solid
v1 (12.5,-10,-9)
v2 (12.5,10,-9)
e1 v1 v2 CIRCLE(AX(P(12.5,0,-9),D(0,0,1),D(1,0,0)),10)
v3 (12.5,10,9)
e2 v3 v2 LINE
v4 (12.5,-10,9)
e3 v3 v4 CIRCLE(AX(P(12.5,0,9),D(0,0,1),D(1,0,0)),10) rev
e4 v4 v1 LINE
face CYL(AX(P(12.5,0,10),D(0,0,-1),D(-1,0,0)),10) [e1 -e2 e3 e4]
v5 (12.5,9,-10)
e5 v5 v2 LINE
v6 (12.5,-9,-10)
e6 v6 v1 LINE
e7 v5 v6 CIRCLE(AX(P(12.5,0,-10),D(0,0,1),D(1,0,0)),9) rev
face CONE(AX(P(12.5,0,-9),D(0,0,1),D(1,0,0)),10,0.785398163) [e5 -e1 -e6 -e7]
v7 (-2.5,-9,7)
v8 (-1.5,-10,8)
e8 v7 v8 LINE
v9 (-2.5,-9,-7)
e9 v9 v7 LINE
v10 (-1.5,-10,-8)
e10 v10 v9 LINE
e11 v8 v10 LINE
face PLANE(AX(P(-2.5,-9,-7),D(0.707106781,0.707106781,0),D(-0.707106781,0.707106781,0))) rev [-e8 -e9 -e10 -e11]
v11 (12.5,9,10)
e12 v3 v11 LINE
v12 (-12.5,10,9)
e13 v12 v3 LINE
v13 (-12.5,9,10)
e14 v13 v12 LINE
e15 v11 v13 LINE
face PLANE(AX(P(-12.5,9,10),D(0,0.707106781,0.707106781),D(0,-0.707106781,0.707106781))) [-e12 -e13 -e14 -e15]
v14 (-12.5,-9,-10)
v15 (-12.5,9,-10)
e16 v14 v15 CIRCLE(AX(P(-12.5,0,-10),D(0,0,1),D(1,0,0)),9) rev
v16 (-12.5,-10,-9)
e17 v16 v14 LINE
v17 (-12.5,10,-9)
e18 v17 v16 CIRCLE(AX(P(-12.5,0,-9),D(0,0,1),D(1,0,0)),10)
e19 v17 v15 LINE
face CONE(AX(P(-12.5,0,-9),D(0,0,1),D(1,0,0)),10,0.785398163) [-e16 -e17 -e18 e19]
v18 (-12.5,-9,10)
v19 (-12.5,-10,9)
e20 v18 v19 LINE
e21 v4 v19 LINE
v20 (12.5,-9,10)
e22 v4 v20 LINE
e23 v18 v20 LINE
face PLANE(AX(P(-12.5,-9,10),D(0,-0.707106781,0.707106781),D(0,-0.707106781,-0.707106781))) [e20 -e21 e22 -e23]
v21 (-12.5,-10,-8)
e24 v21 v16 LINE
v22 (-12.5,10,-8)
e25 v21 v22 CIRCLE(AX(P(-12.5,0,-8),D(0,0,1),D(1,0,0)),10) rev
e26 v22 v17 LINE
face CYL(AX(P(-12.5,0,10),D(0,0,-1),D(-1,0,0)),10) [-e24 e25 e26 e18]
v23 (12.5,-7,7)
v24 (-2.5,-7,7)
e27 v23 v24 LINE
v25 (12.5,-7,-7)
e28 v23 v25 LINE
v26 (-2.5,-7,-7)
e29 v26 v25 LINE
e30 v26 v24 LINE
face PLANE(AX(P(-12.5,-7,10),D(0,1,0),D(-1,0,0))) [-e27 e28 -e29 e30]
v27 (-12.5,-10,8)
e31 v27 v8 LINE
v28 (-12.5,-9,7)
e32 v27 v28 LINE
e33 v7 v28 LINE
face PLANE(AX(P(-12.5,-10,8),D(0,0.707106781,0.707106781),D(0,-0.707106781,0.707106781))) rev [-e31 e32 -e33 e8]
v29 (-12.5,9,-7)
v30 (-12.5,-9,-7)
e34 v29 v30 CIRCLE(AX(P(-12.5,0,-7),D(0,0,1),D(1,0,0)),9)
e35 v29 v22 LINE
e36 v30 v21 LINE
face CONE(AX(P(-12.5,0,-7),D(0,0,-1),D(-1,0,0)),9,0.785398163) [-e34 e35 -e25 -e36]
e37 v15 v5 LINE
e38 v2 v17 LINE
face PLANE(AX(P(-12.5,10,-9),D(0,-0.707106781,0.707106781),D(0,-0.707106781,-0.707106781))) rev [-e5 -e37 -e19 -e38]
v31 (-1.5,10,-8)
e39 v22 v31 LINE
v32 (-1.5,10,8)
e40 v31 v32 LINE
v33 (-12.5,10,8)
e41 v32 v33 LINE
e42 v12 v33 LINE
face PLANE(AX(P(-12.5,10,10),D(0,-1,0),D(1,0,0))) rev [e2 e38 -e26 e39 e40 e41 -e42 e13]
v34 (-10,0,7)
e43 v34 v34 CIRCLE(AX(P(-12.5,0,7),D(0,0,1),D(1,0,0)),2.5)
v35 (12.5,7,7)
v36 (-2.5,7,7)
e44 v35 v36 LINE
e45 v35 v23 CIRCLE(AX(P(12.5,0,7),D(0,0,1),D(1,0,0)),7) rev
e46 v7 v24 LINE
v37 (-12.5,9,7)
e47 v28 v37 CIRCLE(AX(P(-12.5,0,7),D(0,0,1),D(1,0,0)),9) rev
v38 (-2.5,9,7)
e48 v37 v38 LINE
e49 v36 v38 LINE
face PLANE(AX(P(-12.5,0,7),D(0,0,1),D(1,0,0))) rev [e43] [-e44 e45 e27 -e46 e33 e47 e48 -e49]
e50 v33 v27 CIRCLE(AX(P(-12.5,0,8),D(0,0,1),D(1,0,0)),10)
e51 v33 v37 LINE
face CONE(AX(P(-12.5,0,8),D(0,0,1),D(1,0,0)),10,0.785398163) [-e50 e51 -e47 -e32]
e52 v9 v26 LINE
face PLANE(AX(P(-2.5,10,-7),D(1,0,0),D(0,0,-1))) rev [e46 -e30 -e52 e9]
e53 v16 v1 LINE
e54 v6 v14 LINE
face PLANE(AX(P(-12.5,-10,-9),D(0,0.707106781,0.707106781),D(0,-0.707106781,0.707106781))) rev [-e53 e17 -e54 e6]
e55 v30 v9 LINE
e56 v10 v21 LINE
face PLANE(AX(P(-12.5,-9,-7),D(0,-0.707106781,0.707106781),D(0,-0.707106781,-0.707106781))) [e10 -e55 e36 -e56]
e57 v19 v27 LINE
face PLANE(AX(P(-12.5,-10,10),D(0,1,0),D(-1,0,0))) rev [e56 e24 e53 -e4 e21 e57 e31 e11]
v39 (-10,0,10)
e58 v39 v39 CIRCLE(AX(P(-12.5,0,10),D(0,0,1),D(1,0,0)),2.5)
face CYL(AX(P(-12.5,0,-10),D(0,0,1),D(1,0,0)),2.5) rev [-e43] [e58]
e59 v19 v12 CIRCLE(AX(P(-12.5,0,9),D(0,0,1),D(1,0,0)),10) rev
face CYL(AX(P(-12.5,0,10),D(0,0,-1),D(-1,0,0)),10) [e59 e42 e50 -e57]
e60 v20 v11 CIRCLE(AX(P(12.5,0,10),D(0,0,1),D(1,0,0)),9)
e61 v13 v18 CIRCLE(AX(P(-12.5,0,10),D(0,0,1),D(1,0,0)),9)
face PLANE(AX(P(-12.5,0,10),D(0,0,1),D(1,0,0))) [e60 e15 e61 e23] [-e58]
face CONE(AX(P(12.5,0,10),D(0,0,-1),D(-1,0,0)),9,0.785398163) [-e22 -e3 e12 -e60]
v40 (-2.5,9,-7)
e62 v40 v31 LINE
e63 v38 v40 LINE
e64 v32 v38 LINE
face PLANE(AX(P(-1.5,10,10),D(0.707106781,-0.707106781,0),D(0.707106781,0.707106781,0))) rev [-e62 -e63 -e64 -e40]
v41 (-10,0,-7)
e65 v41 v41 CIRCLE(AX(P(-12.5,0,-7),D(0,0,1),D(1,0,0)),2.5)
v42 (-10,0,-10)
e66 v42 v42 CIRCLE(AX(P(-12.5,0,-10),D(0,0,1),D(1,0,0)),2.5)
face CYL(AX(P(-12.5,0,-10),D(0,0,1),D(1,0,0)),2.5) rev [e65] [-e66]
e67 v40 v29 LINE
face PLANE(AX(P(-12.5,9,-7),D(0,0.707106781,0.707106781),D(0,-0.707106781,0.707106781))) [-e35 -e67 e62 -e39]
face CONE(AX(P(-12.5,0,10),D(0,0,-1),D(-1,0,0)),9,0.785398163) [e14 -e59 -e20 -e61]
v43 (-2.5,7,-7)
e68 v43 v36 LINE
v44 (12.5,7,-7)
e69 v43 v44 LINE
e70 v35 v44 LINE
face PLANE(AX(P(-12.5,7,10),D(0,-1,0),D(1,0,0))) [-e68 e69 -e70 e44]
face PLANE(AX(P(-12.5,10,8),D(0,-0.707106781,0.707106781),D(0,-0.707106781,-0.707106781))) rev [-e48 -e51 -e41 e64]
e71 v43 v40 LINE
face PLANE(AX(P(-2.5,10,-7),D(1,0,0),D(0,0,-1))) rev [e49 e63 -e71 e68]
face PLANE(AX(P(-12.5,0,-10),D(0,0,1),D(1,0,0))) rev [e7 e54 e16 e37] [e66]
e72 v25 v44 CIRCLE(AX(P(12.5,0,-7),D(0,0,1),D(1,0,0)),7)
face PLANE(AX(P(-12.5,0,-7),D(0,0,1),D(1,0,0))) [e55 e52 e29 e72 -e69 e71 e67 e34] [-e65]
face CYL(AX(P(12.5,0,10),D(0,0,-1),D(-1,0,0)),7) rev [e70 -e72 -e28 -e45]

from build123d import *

# Parameters (mm, degrees)
BOSS_EXTRUDE1_DEPTH = 10
CUT_EXTRUDE1_DEPTH  = 7
CHAMFER2_SIZE       = 1
CHAMFER3_SIZE       = 1
SKETCH3_R           = 2.5
CUT_EXTRUDE2_DEPTH  = 10
SHELL2_START        = -7
SHELL2_DEPTH        = 14
CHAMFER4_SIZE       = 1


# Read off the part's stored shape, not the designer's step: Shell2
with BuildPart() as part:
    # Sketch1 → Boss-Extrude1 (new, symmetric)
    with BuildSketch(Plane.XY):
        with BuildLine():
            Line((-12.5, 10), (12.5, 10))
            ThreePointArc((12.5, 10), (22.5, 0), (12.5, -10))
            Line((12.5, -10), (-12.5, -10))
            ThreePointArc((-12.5, -10), (-22.5, 0), (-12.5, 10))
        make_face()
    extrude(amount=BOSS_EXTRUDE1_DEPTH, both=True)

    # Sketch2 → Cut-Extrude1 (cut, symmetric)
    with BuildSketch(Plane.XY):
        with BuildLine():
            Line((-12.5, 10), (-2.5, 10))
            Line((-2.5, 10), (-2.5, -10))
            Line((-2.5, -10), (-12.5, -10))
            ThreePointArc((-12.5, -10), (-22.5, 0), (-12.5, 10))
        make_face()
    extrude(amount=CUT_EXTRUDE1_DEPTH, both=True, mode=Mode.SUBTRACT)

    # Chamfer2
    chamfer2_edges = [part.edges().sort_by_distance(p)[0] for p in [
        (-22.5, 0, -7),
        (-7.5, 10, -7),
        (-7.5, -10, -7),
        (-22.5, 0, 7),
        (-7.5, -10, 7),
        (-7.5, 10, 7),
    ]]
    chamfer(chamfer2_edges, length=CHAMFER2_SIZE)

    # Chamfer3
    chamfer3_edges = [part.edges().sort_by_distance(p)[0] for p in [
        (22.5, 0, 10),
        (0, 10, 10),
        (-22.5, 0, 10),
        (0, 10, -10),
        (22.5, 0, -10),
        (0, -10, -10),
        (-22.5, 0, -10),
        (0, -10, 10),
    ]]
    chamfer(chamfer3_edges, length=CHAMFER3_SIZE)

    # Sketch3 → Cut-Extrude2 (cut, symmetric)
    with BuildSketch(Plane.XY):
        with Locations((-12.5, 0)):
            Circle(SKETCH3_R)
    extrude(amount=CUT_EXTRUDE2_DEPTH, both=True, mode=Mode.SUBTRACT)

    # Shell2 outline → Shell2 (cut)
    with BuildSketch(Plane.XY.offset(SHELL2_START)):
        with BuildLine():
            Line((12.5, 7), (-2.5, 7))
            Line((-2.5, 7), (-2.5, -7))
            Line((-2.5, -7), (12.5, -7))
            ThreePointArc((12.5, -7), (19.5, 0), (12.5, 7))
        make_face()
    extrude(amount=SHELL2_DEPTH, mode=Mode.SUBTRACT)

    # Chamfer4
    chamfer4_edges = [part.edges().sort_by_distance(p)[0] for p in [
        (-2.5, -10, 0),
        (-2.5, 10, 0),
    ]]
    chamfer(chamfer4_edges, length=CHAMFER4_SIZE)


solid = part.part
